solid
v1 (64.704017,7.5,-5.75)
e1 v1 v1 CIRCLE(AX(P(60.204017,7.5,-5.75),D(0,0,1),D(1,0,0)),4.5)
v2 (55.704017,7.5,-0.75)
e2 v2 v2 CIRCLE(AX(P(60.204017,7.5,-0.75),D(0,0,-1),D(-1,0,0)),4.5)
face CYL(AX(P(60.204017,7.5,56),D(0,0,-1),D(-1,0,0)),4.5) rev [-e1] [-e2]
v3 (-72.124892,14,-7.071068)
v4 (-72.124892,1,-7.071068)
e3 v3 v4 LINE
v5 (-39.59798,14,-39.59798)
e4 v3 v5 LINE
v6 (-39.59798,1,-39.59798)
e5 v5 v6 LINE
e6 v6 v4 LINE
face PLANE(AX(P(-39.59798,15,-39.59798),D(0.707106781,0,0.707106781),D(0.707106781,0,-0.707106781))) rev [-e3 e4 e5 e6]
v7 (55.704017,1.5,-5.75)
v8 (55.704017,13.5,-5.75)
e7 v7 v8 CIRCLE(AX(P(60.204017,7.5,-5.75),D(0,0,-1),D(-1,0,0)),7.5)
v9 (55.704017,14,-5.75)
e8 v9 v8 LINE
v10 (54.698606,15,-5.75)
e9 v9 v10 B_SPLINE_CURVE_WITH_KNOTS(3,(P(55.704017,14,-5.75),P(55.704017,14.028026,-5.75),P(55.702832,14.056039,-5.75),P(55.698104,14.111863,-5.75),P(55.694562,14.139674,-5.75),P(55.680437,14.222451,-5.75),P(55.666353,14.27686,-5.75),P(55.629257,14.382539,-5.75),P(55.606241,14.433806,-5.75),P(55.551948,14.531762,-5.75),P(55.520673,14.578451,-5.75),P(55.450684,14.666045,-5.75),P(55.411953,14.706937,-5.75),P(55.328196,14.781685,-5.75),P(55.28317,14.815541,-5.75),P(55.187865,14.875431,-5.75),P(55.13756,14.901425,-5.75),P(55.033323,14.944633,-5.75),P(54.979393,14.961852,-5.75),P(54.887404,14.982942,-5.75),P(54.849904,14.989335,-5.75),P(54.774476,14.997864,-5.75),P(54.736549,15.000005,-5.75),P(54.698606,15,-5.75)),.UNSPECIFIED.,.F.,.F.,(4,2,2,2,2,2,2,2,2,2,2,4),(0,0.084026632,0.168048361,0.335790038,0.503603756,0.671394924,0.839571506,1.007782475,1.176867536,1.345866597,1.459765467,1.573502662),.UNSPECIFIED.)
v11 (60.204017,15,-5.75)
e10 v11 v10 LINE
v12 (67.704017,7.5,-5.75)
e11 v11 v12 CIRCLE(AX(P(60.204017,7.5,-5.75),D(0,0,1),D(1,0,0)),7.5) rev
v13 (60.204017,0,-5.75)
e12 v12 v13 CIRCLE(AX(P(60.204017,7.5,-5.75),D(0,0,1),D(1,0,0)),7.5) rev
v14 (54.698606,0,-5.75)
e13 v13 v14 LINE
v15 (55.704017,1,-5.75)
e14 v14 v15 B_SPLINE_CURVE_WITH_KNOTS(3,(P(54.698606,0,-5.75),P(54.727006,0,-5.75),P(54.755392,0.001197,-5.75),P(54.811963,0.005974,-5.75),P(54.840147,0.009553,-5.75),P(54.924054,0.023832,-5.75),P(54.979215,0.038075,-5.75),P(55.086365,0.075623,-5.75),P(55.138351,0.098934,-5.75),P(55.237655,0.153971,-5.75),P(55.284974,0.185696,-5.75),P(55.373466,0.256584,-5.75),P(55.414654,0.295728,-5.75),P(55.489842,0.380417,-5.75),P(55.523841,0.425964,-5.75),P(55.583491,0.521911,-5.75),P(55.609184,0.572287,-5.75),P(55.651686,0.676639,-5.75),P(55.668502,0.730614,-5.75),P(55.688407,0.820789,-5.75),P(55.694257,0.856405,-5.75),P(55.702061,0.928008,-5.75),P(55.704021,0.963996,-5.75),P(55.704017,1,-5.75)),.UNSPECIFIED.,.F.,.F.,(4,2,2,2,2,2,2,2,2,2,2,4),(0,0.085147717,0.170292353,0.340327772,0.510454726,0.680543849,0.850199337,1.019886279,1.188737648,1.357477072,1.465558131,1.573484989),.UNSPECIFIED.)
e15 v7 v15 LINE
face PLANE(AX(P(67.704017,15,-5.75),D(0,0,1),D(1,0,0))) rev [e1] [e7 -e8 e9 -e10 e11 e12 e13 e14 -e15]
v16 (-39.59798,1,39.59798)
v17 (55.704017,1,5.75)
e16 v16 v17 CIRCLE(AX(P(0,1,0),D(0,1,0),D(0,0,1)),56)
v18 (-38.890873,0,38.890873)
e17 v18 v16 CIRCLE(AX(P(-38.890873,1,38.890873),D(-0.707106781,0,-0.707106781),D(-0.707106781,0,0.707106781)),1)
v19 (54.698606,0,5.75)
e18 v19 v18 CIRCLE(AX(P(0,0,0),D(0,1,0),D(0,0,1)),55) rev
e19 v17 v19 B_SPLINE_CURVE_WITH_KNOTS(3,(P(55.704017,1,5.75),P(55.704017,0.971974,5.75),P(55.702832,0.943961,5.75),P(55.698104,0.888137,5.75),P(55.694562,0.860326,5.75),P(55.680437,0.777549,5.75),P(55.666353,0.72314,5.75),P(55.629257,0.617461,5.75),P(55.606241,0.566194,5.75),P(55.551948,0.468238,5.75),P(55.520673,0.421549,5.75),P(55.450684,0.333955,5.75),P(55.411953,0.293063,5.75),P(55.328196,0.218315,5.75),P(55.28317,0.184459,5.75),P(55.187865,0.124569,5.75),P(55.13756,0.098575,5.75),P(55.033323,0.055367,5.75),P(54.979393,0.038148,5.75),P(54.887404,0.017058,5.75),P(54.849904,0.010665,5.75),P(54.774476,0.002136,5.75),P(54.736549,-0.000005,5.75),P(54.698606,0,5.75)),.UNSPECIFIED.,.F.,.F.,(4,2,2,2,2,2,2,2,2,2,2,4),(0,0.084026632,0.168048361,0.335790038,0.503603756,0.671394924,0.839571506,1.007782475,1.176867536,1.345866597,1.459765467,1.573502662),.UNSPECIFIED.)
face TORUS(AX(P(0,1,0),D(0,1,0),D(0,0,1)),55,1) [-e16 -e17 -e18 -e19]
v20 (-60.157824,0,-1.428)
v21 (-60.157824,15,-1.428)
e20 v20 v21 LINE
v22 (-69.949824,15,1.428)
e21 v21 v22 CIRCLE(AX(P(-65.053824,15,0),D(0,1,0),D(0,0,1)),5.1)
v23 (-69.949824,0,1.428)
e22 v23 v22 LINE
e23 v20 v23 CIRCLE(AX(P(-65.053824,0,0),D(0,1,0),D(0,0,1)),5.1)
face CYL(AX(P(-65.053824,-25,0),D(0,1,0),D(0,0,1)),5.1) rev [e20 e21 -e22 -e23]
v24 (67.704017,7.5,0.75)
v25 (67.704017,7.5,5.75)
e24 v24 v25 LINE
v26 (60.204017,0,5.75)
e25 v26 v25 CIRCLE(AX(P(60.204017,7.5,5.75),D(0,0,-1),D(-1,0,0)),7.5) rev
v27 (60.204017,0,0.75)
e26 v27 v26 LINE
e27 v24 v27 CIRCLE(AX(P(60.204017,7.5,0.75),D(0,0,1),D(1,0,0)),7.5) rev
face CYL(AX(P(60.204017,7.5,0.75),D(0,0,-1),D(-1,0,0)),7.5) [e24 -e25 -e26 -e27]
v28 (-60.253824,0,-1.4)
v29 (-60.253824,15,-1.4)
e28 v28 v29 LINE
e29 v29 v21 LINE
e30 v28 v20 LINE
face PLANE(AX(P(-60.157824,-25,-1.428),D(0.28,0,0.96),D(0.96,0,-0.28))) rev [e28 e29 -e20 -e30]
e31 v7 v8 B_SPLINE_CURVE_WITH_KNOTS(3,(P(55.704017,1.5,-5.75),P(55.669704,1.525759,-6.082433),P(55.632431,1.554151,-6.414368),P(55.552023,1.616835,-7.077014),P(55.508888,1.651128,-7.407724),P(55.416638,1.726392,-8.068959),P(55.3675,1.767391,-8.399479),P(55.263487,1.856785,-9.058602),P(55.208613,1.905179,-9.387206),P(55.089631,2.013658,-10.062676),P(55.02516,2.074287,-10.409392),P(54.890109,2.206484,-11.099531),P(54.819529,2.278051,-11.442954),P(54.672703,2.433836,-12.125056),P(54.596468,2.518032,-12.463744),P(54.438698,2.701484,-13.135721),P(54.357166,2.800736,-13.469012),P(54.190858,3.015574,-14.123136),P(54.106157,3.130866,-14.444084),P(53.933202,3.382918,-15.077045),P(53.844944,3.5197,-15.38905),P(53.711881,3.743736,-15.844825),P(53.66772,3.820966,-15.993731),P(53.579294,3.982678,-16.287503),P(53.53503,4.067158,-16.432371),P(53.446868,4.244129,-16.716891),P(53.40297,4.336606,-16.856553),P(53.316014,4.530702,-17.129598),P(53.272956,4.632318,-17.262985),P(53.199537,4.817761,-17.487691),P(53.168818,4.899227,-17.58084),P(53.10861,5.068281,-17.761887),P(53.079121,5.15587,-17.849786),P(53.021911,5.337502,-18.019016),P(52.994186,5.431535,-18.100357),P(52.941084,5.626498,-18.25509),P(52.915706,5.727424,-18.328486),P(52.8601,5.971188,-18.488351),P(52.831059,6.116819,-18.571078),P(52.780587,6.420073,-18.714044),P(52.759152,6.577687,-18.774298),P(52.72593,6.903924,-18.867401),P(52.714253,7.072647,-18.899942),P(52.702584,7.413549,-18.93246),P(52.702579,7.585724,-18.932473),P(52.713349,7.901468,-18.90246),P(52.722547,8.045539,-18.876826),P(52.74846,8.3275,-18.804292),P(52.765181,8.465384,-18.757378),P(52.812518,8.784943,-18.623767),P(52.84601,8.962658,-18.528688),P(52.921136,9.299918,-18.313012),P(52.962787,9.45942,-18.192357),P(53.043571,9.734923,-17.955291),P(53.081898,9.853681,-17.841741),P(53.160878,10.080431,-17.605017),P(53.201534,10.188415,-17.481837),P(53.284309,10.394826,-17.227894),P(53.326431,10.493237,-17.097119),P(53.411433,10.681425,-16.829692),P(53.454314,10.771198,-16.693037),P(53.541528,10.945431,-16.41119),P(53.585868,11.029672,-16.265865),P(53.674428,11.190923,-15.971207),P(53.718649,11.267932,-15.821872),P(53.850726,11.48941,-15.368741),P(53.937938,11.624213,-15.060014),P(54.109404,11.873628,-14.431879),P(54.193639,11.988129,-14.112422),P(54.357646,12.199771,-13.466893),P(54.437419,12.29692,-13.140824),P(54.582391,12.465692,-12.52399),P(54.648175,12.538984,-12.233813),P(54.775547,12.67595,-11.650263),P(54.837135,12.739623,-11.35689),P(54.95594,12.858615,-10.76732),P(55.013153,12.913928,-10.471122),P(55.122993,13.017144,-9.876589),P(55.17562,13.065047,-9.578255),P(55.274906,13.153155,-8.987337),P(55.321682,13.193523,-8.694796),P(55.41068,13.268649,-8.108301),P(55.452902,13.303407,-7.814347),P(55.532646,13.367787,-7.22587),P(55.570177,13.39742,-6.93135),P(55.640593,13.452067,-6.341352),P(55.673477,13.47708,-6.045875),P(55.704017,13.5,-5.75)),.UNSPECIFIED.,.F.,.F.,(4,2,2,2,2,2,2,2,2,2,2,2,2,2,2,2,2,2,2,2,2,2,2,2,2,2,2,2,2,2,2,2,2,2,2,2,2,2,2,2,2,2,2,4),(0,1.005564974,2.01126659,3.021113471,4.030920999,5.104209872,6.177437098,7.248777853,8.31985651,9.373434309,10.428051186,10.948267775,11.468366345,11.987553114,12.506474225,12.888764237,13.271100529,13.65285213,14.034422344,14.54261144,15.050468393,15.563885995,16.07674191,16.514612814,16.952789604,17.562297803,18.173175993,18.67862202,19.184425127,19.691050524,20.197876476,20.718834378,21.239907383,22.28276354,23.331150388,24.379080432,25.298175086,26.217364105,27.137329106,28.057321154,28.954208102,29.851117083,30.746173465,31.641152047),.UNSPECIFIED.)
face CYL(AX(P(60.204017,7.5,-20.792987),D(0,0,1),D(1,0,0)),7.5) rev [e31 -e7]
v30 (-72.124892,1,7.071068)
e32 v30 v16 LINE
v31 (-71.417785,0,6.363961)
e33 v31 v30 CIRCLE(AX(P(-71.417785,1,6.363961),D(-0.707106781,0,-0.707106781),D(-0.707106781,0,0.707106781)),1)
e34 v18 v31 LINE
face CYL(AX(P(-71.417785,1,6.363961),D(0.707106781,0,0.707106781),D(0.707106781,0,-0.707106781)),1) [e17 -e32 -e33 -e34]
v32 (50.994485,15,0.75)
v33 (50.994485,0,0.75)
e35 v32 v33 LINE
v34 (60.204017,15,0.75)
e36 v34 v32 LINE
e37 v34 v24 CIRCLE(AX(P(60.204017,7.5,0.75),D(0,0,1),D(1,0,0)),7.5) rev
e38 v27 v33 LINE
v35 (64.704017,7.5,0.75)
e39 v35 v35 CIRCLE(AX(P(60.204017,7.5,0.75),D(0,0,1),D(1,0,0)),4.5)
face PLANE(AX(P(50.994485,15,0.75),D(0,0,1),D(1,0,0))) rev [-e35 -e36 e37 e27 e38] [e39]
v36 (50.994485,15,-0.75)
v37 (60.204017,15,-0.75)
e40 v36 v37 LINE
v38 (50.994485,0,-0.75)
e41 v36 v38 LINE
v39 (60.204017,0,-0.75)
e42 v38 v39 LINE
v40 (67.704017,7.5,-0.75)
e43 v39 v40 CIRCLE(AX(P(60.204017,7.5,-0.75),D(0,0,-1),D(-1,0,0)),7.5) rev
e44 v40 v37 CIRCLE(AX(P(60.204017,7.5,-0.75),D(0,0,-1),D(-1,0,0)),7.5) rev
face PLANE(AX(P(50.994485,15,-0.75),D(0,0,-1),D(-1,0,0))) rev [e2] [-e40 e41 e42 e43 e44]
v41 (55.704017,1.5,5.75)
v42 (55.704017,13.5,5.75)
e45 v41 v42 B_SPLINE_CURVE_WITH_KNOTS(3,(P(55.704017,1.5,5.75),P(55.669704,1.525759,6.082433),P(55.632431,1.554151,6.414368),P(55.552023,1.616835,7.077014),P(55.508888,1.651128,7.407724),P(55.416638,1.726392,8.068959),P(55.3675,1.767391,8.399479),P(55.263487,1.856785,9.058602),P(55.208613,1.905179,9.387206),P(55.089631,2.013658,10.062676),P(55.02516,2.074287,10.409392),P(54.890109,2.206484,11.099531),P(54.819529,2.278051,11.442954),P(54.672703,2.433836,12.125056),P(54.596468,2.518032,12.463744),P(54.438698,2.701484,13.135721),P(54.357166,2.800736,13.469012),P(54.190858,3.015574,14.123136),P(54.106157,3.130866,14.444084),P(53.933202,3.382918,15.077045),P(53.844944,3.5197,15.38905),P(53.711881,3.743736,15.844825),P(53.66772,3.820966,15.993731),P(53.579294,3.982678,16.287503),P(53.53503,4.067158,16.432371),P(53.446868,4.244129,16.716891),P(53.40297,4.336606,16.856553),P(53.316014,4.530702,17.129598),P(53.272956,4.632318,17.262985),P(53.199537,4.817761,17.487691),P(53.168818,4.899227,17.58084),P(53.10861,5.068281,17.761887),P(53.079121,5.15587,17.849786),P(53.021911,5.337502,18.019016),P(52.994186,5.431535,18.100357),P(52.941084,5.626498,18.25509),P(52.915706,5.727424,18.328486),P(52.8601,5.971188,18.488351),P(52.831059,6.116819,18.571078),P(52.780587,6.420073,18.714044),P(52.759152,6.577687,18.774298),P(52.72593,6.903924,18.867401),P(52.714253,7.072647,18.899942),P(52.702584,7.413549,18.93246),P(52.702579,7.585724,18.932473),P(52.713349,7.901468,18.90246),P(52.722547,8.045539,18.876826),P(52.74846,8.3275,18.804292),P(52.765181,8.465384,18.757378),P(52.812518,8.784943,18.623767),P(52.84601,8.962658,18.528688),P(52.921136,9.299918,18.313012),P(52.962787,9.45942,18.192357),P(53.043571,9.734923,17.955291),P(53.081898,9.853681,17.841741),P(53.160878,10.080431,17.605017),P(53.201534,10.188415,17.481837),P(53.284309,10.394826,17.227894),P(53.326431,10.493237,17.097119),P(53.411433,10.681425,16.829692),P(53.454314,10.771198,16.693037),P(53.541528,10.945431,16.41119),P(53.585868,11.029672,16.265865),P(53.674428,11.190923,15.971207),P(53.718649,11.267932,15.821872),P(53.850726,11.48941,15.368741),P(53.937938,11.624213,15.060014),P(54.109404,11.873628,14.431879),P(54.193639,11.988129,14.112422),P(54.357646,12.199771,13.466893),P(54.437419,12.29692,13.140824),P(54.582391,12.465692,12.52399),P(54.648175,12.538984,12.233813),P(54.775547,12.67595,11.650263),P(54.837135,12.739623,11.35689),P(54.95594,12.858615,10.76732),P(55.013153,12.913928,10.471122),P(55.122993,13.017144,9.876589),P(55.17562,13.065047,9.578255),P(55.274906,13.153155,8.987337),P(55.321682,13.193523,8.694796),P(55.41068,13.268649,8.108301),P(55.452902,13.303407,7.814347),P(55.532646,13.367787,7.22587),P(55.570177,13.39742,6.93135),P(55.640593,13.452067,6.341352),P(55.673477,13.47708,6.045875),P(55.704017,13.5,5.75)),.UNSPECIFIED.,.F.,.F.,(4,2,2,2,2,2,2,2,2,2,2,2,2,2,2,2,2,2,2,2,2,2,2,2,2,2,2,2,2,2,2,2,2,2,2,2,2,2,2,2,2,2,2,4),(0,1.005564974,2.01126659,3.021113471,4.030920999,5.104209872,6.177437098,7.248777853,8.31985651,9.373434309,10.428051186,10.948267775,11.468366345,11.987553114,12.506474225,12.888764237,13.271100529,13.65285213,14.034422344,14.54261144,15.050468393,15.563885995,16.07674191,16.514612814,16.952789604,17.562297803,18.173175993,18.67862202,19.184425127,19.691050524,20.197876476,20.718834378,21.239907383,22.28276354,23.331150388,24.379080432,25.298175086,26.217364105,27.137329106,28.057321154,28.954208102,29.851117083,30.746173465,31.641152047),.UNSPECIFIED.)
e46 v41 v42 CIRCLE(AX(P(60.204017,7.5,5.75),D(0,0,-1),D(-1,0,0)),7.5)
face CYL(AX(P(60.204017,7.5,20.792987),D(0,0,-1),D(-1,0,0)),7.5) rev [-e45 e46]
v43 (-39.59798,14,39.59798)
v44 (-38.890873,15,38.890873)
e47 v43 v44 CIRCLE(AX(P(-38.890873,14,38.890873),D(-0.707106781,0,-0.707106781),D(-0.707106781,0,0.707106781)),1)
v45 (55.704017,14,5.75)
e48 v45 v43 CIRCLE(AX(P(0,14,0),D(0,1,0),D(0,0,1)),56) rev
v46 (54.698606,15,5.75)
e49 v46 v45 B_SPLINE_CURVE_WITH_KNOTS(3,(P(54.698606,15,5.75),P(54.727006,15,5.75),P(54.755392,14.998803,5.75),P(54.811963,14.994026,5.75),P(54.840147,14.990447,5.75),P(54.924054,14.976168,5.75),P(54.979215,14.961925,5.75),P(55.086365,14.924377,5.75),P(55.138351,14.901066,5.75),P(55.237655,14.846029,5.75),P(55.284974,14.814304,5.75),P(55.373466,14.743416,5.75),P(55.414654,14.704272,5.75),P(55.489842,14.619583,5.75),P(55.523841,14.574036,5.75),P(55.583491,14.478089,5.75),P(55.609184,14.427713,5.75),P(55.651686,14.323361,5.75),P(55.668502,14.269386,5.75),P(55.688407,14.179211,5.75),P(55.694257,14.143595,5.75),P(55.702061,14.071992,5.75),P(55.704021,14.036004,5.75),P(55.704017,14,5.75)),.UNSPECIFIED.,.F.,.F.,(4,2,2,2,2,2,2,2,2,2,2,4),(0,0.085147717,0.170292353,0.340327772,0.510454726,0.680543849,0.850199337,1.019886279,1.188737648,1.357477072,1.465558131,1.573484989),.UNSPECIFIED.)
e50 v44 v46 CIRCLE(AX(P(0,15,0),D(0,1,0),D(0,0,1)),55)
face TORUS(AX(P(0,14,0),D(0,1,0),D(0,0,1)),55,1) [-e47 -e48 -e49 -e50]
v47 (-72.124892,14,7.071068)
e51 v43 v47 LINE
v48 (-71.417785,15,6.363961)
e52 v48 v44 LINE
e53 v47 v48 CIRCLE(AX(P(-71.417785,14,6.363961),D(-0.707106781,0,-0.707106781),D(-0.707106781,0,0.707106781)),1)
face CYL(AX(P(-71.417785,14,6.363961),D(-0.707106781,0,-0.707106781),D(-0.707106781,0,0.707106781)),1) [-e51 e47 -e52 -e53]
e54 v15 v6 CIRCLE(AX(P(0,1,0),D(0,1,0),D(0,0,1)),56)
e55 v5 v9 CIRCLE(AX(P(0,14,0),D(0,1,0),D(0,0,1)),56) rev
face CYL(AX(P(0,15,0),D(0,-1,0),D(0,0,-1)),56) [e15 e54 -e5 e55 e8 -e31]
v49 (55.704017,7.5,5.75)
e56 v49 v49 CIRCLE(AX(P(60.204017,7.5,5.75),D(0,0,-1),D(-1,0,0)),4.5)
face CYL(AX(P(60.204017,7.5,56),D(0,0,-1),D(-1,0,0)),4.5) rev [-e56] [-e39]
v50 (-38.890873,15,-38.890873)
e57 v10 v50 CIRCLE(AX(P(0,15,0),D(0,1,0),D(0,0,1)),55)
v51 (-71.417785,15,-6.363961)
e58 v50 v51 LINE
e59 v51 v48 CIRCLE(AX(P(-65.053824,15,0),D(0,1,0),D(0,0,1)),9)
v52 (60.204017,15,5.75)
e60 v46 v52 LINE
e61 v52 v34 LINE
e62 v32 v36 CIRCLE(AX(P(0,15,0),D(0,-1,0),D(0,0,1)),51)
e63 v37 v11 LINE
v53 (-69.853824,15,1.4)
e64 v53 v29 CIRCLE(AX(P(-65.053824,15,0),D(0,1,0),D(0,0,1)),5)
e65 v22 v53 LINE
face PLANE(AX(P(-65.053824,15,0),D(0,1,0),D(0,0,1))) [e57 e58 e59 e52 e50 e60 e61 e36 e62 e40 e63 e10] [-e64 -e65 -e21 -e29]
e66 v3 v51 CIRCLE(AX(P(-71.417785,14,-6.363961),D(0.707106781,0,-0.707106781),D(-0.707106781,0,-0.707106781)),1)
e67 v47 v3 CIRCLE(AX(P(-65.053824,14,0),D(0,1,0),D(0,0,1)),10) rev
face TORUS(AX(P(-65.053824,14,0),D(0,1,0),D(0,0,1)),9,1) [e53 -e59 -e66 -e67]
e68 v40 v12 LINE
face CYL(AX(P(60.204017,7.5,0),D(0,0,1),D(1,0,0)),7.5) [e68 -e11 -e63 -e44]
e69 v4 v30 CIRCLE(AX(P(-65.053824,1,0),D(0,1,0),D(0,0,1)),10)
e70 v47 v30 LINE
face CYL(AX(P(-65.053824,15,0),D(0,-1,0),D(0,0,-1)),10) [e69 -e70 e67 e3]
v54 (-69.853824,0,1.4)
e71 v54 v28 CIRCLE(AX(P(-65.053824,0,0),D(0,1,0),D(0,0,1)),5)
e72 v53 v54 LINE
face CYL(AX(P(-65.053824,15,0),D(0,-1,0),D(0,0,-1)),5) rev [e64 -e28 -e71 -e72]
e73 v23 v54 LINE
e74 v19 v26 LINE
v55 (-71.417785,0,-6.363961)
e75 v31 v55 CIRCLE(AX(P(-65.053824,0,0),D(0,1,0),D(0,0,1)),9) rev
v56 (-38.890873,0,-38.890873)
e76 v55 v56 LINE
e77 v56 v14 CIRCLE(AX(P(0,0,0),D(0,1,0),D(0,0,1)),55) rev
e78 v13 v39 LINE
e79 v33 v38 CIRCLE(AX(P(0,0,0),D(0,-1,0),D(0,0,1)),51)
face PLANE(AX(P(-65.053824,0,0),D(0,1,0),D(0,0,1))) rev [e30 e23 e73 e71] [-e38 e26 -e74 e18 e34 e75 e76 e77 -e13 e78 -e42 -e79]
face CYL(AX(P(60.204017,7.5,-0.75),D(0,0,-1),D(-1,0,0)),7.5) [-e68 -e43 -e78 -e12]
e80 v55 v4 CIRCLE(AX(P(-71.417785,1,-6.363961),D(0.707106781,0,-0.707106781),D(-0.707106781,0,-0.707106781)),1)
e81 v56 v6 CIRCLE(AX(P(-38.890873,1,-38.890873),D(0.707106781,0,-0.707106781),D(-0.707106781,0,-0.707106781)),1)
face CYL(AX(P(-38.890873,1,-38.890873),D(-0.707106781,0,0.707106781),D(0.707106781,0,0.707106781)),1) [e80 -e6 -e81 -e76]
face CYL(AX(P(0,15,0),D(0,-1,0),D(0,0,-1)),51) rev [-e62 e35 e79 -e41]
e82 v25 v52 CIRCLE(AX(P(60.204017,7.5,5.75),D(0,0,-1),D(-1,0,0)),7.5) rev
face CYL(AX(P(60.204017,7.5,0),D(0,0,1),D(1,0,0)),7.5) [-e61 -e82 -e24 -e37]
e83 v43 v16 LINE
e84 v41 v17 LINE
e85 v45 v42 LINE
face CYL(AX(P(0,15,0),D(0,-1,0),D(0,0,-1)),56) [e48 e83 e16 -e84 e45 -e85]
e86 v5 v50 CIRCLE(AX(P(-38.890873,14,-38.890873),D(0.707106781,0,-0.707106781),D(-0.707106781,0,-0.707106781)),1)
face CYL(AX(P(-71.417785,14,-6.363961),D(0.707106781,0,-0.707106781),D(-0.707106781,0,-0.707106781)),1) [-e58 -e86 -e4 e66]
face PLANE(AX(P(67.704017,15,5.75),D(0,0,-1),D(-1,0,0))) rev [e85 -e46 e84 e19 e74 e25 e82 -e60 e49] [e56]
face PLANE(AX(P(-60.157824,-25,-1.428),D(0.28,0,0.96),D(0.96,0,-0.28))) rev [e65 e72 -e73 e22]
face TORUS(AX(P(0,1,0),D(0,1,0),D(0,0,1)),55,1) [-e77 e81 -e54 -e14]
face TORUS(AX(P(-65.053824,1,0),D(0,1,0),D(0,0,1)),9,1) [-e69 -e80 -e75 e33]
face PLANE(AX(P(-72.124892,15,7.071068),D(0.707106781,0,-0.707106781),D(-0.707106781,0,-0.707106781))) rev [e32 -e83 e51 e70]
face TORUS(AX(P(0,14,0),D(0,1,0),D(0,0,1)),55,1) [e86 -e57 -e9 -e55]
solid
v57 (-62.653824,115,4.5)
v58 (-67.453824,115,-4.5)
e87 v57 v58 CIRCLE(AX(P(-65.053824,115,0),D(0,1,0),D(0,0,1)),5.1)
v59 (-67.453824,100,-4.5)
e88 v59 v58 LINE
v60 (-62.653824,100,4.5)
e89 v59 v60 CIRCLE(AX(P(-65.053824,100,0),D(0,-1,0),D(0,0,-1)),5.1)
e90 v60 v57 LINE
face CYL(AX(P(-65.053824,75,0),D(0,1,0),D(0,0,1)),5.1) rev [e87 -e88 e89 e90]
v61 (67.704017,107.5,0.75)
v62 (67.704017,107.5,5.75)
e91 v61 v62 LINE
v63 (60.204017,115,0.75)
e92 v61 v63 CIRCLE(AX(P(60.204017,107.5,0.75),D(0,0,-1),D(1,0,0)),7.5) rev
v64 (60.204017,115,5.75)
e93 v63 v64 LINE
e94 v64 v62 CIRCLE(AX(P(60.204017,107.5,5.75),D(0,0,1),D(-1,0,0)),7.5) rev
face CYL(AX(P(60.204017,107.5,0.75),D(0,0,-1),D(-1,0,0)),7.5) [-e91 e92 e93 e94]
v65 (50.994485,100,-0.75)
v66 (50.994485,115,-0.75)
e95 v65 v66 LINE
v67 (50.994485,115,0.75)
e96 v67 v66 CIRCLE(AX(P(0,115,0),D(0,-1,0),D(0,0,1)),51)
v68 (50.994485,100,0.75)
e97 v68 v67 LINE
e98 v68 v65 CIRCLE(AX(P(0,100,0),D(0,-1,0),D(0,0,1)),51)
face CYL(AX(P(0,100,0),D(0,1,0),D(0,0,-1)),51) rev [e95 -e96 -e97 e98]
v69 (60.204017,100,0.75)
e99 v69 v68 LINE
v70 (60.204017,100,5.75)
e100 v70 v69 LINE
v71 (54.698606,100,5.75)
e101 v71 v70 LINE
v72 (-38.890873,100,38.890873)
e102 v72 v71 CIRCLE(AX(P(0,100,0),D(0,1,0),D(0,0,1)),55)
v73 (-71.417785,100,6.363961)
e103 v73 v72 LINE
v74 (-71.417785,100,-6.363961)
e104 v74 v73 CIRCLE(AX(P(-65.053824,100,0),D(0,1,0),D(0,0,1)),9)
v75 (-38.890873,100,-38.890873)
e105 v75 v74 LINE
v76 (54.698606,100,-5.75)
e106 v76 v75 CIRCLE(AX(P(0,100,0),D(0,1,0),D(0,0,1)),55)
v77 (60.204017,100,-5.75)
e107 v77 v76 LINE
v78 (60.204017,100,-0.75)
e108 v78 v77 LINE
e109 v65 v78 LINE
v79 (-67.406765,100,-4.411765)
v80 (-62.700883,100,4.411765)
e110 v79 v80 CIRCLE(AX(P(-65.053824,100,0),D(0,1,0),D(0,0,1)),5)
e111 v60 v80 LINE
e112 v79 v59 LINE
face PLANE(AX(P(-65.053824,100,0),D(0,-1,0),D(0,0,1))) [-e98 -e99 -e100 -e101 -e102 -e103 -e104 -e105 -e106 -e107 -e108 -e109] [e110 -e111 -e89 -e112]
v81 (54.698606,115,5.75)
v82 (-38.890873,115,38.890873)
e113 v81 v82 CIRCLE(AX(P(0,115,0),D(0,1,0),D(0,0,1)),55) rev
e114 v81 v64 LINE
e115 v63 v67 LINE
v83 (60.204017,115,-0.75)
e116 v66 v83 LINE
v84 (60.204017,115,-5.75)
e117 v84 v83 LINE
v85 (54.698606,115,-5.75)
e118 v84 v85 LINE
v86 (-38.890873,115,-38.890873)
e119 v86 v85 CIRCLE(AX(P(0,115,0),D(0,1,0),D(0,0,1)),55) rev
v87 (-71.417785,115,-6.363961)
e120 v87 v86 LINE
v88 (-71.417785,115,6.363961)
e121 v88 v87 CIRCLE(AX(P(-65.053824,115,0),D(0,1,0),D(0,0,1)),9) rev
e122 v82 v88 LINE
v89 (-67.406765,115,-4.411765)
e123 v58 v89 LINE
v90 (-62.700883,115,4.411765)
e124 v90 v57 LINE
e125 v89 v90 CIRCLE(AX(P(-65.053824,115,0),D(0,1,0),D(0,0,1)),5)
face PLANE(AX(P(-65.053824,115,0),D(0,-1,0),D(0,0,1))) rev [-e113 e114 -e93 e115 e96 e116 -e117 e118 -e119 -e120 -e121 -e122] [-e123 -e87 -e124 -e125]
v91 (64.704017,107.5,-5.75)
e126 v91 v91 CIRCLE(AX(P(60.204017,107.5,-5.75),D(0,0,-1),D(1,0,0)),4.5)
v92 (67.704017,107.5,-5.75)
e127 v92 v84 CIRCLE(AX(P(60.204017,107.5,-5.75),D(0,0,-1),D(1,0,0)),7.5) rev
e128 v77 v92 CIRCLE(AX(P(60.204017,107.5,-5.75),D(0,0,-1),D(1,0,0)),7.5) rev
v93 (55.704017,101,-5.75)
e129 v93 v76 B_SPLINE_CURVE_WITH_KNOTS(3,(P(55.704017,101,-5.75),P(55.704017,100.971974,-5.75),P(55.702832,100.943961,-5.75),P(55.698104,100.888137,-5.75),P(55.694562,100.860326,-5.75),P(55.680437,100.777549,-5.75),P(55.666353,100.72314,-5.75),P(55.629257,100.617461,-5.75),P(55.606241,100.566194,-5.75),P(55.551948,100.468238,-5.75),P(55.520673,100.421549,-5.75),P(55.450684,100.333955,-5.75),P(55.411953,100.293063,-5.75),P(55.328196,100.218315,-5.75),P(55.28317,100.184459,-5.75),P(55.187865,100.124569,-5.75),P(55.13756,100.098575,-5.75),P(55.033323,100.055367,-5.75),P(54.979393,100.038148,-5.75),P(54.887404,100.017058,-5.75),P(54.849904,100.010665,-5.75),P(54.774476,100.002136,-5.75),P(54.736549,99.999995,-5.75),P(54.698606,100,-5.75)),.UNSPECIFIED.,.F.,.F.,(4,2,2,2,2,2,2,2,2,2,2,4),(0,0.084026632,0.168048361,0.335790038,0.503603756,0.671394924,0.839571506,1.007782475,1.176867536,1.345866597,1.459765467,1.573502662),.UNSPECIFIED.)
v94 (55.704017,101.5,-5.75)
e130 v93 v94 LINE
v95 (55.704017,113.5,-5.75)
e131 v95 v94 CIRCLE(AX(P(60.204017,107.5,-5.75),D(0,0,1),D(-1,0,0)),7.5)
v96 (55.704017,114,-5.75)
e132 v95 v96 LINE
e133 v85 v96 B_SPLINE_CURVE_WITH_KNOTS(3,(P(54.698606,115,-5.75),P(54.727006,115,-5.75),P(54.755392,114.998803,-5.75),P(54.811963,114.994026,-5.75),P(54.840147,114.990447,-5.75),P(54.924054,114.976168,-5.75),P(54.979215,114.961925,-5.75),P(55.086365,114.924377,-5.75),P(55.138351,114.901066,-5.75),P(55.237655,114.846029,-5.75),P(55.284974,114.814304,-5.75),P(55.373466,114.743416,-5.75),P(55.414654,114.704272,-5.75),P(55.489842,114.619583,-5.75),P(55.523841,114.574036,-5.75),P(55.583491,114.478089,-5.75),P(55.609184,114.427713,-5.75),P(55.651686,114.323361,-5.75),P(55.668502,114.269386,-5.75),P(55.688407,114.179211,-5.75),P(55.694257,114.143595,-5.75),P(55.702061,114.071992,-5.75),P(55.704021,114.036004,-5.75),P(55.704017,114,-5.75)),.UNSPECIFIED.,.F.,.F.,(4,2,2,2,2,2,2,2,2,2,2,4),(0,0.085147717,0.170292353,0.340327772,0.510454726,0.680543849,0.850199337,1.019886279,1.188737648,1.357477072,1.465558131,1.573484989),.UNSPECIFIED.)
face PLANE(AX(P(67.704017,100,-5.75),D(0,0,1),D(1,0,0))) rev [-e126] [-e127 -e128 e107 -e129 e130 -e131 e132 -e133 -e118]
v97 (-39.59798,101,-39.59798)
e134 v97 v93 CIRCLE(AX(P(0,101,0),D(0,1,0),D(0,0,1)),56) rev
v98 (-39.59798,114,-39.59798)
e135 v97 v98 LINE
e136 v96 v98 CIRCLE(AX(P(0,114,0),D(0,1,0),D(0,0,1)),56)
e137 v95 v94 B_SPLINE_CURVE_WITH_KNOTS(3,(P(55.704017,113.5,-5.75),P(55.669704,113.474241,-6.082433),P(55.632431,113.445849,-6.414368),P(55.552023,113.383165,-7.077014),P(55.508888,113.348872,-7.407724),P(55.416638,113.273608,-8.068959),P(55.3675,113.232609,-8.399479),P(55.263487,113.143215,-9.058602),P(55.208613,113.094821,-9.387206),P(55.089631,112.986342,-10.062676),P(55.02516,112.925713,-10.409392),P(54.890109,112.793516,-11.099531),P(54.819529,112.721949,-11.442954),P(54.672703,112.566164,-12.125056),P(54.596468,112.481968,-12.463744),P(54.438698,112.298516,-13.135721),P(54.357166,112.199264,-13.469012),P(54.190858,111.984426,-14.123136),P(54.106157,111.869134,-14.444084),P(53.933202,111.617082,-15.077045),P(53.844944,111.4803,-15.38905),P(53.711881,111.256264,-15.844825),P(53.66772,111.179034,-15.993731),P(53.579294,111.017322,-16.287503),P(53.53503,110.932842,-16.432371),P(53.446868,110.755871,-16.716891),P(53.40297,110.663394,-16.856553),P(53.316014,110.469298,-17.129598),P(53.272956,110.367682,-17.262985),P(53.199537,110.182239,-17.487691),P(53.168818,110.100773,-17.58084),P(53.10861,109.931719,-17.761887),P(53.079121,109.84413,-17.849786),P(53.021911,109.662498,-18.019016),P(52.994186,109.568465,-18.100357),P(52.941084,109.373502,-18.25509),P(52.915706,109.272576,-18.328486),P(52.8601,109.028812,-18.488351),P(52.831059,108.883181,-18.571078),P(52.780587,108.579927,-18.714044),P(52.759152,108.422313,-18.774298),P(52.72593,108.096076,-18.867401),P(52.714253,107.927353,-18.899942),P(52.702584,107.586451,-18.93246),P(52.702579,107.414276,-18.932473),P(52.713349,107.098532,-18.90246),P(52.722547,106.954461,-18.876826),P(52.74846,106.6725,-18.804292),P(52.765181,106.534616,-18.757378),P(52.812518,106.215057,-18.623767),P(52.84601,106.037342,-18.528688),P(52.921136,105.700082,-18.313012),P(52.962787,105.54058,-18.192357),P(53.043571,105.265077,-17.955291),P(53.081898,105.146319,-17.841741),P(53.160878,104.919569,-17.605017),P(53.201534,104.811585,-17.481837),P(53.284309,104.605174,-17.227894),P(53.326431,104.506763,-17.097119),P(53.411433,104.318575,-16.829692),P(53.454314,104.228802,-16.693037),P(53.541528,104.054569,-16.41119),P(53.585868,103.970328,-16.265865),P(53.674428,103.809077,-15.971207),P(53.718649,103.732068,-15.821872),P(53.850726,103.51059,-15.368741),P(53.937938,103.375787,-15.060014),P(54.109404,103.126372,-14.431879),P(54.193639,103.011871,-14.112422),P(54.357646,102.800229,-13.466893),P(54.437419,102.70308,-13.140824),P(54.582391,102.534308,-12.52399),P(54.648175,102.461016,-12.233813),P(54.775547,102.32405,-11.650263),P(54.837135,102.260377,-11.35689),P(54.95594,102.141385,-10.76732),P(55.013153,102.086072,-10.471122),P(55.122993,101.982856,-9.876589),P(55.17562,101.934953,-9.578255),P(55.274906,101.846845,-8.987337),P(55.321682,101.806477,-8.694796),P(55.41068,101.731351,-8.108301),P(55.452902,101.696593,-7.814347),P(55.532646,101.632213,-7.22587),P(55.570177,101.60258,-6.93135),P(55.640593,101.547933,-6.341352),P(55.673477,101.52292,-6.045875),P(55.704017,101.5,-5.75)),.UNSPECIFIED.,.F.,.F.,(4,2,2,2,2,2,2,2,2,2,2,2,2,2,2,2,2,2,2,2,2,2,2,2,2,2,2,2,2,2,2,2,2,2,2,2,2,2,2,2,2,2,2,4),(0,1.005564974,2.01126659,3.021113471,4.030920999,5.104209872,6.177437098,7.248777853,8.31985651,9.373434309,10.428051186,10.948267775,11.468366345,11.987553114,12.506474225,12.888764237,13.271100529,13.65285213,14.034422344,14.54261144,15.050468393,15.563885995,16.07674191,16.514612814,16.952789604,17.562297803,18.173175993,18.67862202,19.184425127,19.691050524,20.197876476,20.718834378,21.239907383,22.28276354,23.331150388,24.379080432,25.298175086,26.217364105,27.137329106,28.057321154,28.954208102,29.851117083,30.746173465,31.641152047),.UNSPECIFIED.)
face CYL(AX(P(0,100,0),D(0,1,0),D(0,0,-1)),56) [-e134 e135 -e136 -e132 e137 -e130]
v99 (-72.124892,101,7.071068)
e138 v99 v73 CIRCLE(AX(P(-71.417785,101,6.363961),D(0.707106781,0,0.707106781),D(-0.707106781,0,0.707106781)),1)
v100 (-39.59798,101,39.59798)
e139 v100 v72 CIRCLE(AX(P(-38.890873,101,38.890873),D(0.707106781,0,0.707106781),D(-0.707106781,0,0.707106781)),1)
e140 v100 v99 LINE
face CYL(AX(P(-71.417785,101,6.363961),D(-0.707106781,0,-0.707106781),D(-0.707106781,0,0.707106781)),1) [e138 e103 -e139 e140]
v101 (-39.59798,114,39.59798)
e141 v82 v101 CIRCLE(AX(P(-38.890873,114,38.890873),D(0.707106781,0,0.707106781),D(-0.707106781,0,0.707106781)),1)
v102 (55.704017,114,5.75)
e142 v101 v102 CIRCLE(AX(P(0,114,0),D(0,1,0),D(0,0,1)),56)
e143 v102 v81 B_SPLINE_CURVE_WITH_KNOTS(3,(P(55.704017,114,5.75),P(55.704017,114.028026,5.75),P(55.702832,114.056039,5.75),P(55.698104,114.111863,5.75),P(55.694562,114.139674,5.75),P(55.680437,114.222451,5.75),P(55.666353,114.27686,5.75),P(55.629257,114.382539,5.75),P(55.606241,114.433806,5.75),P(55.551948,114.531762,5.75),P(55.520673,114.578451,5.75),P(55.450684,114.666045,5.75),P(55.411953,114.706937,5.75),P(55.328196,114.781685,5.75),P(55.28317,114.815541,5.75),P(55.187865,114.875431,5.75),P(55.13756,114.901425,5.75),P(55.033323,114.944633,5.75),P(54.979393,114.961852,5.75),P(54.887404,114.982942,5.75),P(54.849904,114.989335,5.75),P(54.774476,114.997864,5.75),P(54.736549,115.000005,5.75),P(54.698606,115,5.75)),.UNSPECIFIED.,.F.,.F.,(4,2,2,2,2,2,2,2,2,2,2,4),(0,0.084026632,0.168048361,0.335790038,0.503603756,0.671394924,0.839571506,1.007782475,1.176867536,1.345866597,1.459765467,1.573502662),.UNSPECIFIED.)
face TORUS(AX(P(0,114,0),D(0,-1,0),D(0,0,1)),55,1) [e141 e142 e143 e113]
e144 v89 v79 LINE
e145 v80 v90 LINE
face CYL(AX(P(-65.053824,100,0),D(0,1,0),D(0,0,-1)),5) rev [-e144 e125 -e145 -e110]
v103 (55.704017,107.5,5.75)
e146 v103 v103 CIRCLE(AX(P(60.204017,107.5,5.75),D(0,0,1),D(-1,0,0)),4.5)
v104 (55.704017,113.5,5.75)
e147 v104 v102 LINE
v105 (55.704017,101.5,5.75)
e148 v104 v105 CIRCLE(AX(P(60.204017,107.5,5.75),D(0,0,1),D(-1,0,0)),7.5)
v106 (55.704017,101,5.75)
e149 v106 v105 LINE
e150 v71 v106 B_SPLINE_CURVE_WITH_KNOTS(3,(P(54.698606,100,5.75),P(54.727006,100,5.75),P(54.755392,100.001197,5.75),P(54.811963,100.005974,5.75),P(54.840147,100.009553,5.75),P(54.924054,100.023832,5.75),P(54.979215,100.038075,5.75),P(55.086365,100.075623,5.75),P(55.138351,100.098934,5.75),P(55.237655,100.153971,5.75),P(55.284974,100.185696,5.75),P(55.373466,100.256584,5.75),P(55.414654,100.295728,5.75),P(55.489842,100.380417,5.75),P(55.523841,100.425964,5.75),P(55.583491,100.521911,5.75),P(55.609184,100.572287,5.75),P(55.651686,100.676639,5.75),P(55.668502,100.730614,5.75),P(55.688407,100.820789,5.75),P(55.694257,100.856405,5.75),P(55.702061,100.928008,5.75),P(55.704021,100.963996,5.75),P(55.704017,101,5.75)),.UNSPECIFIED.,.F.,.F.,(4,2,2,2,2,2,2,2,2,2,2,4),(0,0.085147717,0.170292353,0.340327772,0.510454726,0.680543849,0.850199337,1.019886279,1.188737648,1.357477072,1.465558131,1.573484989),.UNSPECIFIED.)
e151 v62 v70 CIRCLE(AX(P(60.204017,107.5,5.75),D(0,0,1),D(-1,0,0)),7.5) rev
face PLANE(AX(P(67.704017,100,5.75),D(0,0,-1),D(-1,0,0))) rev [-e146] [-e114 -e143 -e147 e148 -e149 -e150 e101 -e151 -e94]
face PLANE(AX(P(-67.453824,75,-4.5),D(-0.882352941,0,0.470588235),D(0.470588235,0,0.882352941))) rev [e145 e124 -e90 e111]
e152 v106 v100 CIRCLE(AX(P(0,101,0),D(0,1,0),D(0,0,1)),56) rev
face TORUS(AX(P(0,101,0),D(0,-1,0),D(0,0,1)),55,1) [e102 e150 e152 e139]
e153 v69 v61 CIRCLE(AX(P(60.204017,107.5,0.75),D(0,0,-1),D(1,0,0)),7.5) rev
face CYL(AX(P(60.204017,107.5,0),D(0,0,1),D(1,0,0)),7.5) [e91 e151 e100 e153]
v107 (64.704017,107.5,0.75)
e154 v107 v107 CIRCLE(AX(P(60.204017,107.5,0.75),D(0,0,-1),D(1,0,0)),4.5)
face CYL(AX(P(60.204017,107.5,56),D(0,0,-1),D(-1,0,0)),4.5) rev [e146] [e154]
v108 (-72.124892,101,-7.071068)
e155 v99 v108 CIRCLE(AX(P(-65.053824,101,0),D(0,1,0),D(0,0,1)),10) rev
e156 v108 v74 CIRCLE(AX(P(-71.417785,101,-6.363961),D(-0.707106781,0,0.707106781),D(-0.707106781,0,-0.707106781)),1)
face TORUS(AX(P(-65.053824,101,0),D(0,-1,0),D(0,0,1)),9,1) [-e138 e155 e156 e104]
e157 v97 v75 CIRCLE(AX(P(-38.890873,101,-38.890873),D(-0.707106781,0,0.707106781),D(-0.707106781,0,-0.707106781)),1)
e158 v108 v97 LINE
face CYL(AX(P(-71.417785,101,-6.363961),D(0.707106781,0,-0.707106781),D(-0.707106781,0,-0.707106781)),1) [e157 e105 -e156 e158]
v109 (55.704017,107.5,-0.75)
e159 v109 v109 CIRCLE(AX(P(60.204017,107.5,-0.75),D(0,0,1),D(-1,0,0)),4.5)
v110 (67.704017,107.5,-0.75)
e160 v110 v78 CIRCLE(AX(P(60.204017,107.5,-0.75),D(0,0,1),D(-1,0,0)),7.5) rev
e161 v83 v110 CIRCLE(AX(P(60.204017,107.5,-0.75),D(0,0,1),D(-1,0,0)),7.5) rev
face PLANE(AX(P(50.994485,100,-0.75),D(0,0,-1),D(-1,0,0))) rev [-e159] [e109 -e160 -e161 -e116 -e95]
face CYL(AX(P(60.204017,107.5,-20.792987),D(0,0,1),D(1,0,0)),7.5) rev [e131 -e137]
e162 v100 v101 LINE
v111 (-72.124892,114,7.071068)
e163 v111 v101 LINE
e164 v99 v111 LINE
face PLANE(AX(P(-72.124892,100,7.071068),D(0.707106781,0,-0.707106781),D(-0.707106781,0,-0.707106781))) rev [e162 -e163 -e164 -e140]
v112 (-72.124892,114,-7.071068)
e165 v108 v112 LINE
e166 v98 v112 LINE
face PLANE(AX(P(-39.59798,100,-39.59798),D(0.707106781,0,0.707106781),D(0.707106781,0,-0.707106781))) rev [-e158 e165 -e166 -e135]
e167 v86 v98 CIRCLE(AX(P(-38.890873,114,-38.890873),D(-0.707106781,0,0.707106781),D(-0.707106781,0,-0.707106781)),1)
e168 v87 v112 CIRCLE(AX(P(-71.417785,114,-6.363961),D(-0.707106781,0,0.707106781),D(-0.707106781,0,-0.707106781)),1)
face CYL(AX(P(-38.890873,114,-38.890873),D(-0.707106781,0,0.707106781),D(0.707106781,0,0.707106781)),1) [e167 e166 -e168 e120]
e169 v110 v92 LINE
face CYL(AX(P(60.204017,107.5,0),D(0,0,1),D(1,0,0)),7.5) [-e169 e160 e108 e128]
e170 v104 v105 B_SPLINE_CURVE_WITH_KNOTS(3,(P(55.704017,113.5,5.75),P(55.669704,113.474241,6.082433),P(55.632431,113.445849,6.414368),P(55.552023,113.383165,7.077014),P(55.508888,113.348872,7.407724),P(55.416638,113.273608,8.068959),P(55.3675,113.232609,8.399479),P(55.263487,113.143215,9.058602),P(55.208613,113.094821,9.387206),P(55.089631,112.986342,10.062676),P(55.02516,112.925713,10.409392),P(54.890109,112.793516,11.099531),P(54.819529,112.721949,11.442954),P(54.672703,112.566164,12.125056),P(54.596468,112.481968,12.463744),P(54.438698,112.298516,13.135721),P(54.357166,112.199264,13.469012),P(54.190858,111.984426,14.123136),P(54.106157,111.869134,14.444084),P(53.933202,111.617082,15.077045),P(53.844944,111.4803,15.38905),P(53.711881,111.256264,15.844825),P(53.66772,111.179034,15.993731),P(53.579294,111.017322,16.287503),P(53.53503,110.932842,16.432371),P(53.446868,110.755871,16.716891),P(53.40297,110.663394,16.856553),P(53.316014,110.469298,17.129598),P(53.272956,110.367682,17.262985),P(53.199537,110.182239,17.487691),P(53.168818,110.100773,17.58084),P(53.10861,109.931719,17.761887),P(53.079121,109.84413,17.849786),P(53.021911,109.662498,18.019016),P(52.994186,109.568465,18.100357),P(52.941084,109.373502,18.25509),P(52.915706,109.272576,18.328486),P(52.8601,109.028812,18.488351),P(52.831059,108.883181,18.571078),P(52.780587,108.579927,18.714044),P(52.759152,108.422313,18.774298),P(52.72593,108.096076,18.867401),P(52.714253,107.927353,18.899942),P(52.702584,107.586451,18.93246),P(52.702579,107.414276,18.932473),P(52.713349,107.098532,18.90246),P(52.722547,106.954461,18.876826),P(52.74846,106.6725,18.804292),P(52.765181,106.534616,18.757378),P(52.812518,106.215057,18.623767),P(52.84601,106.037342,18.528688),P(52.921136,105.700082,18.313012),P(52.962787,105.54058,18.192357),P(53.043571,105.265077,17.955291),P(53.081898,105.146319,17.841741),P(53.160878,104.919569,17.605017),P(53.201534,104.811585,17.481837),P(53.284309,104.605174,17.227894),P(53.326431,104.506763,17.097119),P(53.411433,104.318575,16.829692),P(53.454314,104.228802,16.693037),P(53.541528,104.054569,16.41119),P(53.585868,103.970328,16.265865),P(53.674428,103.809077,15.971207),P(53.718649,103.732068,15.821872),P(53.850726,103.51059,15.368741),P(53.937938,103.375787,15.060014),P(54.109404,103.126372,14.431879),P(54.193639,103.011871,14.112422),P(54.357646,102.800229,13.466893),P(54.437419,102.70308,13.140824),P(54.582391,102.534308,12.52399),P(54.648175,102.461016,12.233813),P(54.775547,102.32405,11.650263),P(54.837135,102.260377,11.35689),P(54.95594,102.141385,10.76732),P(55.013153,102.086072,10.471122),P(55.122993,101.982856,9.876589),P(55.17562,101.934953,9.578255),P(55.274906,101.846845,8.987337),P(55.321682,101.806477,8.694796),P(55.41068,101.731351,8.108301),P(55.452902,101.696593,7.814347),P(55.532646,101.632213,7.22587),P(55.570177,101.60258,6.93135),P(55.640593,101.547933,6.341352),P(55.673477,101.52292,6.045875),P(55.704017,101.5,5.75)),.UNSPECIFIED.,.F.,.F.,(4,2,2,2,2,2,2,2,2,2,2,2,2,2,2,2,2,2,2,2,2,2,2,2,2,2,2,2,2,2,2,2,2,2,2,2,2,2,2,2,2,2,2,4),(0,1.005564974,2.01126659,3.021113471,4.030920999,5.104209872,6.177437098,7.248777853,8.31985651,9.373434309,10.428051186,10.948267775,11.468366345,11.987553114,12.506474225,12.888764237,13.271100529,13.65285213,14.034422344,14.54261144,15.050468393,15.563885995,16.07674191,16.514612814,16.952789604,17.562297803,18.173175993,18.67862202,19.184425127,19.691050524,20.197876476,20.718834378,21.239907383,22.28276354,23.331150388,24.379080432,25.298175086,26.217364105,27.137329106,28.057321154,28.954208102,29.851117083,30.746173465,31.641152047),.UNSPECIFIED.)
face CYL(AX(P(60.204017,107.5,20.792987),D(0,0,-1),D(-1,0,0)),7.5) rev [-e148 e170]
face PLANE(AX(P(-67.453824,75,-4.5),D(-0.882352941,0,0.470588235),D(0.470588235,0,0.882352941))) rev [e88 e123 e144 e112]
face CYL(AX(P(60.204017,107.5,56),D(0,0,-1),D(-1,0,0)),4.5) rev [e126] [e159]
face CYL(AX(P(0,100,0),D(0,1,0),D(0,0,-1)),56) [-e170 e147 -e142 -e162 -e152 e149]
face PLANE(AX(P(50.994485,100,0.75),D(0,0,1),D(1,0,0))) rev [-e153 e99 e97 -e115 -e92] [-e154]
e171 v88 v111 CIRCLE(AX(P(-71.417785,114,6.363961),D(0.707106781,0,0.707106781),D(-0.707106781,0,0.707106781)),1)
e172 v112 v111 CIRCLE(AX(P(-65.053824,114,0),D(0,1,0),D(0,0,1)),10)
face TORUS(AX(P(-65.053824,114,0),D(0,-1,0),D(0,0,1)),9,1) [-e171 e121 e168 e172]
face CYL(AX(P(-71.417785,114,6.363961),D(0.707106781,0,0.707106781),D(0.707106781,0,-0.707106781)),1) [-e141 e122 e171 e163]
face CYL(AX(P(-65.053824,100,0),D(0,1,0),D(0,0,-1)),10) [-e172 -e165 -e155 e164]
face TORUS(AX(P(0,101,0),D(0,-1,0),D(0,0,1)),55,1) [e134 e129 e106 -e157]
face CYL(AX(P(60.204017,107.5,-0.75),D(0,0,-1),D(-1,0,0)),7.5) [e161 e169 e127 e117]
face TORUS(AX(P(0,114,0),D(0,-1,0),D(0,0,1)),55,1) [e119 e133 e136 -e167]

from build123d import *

# Parameters (mm, degrees)
SKETCH1_R               = 5
BOSS_EXTRUDE1_DEPTH     = 15
CUT_EXTRUDE2_DEPTH      = 99.341949225
CUT_EXTRUDE2_DEPTH_BACK = 99.341949225
SKETCH3_R               = 4.5
SKETCH4_R               = 7.5
CUT_EXTRUDE3_DEPTH      = 15.042987435
FILLET1_R               = 7.5
FILLET2_R               = 1
CUT_EXTRUDE4_DEPTH      = 40
CUT_EXTRUDE5_DEPTH      = 40


with BuildPart() as part:
    # Sketch1 → Boss-Extrude1 (new body)
    with BuildSketch(Plane(origin=(0, 0, 0), x_dir=(1, 0, 0), z_dir=(0, 1, 0))):
        with BuildLine():
            Line((-39.597979746, 39.597979746), (-72.124891681, 7.071067812))
            ThreePointArc((-72.124891681, 7.071067812), (-75.053823869, 0), (-72.124891681, -7.071067812))
            Line((-72.124891681, -7.071067812), (-39.597979746, -39.597979746))
            ThreePointArc((-39.597979746, -39.597979746), (18.742266179, -52.770516944), (55.704016911, -5.75))
            Line((55.704016911, -5.75), (67.704016911, -5.75))
            Line((67.704016911, -5.75), (67.704016911, -0.75))
            Line((67.704016911, -0.75), (50.994484996, -0.75))
            ThreePointArc((50.994484996, -0.75), (-51, 0), (50.994484996, 0.75))
            Line((50.994484996, 0.75), (67.704016911, 0.75))
            Line((67.704016911, 0.75), (67.704016911, 5.75))
            Line((67.704016911, 5.75), (55.704016911, 5.75))
            ThreePointArc((55.704016911, 5.75), (18.742266179, 52.770516944), (-39.597979746, 39.597979746))
        make_face()
        with Locations(Location((-65.053823869, 0, 0), (0, 0, 270))):
            Circle(SKETCH1_R, mode=Mode.SUBTRACT)
    extrude(amount=BOSS_EXTRUDE1_DEPTH)

    # Sketch3 → Cut-Extrude2 (cut, two sides: drawn at the far end of the back side and taken through both)
    with BuildSketch(Plane(origin=(0, 0, -5.75), x_dir=(-1, 0, 0), z_dir=(0, 0, -1)).offset(-CUT_EXTRUDE2_DEPTH_BACK)):
        with Locations((-60.204016911, 7.5)):
            Circle(SKETCH3_R)
    extrude(amount=CUT_EXTRUDE2_DEPTH + CUT_EXTRUDE2_DEPTH_BACK, mode=Mode.SUBTRACT)

    # Sketch4 → Cut-Extrude3 (cut)
    with BuildSketch(Plane(origin=(0, 0, -5.75), x_dir=(-1, 0, 0), z_dir=(0, 0, -1))):
        with Locations((-60.204016911, 7.5)):
            Circle(SKETCH4_R)
    cut_extrude3 = extrude(amount=CUT_EXTRUDE3_DEPTH, mode=Mode.SUBTRACT)

    # Mirror8: Cut-Extrude3 across plane
    add(cut_extrude3.mirror(Plane.XY), mode=Mode.SUBTRACT)

    # Fillet1
    fillet1_edges = [part.edges().sort_by_distance(p)[0] for p in [
        (67.704016911, 15, -3.25),
        (67.704016911, 0, -3.25),
        (67.704016911, 0, 3.25),
        (67.704016911, 15, 3.25),
    ]]
    fillet(fillet1_edges, radius=FILLET1_R - 0.0001)  # a hair under: the kernel refuses the full size

    # Fillet2
    fillet2_edges = [part.edges().sort_by_distance(p)[0] for p in [
        (-55.861435714, 0, -23.334523779),
        (18.742266179, 0, -52.770516944),
        (18.742266179, 15, 52.770516944),
        (18.742266179, 0, 52.770516944),
        (-55.861435714, 0, 23.334523779),
        (-75.053823869, 0, 0),
        (18.742266179, 15, -52.770516944),
        (-55.861435714, 15, -23.334523779),
        (-75.053823869, 15, 0),
        (-55.861435714, 15, 23.334523779),
    ]]
    fillet(fillet2_edges, radius=FILLET2_R)


with BuildPart() as body_2:
    # Mirror10: mirrored copy
    add(part.part.mirror(Plane.ZX.offset(57.5)))

    # Sketch10 → Cut-Extrude4 (cut)
    with BuildSketch(Plane(origin=(0, 115, 0), x_dir=(1, 0, 0), z_dir=(0, 1, 0))):
        with BuildLine():
            Line((-67.453823869, 4.5), (-62.653823869, -4.5))
            ThreePointArc((-62.653823869, -4.5), (-60.553823869, 2.4), (-67.453823869, 4.5))
        make_face()
    extrude(amount=-CUT_EXTRUDE4_DEPTH, mode=Mode.SUBTRACT)


with BuildPart() as part_1:
    add(part.part)

    # Sketch11 → Cut-Extrude5 (cut)
    with BuildSketch(Plane(origin=(0, 15, 0), x_dir=(1, 0, 0), z_dir=(0, 1, 0))):
        with BuildLine():
            Line((-60.157823869, 1.428), (-69.949823869, -1.428))
            ThreePointArc((-69.949823869, -1.428), (-66.481823869, 4.896), (-60.157823869, 1.428))
        make_face()
    extrude(amount=-CUT_EXTRUDE5_DEPTH, mode=Mode.SUBTRACT)


solid = Compound([body_2.part, part_1.part])
